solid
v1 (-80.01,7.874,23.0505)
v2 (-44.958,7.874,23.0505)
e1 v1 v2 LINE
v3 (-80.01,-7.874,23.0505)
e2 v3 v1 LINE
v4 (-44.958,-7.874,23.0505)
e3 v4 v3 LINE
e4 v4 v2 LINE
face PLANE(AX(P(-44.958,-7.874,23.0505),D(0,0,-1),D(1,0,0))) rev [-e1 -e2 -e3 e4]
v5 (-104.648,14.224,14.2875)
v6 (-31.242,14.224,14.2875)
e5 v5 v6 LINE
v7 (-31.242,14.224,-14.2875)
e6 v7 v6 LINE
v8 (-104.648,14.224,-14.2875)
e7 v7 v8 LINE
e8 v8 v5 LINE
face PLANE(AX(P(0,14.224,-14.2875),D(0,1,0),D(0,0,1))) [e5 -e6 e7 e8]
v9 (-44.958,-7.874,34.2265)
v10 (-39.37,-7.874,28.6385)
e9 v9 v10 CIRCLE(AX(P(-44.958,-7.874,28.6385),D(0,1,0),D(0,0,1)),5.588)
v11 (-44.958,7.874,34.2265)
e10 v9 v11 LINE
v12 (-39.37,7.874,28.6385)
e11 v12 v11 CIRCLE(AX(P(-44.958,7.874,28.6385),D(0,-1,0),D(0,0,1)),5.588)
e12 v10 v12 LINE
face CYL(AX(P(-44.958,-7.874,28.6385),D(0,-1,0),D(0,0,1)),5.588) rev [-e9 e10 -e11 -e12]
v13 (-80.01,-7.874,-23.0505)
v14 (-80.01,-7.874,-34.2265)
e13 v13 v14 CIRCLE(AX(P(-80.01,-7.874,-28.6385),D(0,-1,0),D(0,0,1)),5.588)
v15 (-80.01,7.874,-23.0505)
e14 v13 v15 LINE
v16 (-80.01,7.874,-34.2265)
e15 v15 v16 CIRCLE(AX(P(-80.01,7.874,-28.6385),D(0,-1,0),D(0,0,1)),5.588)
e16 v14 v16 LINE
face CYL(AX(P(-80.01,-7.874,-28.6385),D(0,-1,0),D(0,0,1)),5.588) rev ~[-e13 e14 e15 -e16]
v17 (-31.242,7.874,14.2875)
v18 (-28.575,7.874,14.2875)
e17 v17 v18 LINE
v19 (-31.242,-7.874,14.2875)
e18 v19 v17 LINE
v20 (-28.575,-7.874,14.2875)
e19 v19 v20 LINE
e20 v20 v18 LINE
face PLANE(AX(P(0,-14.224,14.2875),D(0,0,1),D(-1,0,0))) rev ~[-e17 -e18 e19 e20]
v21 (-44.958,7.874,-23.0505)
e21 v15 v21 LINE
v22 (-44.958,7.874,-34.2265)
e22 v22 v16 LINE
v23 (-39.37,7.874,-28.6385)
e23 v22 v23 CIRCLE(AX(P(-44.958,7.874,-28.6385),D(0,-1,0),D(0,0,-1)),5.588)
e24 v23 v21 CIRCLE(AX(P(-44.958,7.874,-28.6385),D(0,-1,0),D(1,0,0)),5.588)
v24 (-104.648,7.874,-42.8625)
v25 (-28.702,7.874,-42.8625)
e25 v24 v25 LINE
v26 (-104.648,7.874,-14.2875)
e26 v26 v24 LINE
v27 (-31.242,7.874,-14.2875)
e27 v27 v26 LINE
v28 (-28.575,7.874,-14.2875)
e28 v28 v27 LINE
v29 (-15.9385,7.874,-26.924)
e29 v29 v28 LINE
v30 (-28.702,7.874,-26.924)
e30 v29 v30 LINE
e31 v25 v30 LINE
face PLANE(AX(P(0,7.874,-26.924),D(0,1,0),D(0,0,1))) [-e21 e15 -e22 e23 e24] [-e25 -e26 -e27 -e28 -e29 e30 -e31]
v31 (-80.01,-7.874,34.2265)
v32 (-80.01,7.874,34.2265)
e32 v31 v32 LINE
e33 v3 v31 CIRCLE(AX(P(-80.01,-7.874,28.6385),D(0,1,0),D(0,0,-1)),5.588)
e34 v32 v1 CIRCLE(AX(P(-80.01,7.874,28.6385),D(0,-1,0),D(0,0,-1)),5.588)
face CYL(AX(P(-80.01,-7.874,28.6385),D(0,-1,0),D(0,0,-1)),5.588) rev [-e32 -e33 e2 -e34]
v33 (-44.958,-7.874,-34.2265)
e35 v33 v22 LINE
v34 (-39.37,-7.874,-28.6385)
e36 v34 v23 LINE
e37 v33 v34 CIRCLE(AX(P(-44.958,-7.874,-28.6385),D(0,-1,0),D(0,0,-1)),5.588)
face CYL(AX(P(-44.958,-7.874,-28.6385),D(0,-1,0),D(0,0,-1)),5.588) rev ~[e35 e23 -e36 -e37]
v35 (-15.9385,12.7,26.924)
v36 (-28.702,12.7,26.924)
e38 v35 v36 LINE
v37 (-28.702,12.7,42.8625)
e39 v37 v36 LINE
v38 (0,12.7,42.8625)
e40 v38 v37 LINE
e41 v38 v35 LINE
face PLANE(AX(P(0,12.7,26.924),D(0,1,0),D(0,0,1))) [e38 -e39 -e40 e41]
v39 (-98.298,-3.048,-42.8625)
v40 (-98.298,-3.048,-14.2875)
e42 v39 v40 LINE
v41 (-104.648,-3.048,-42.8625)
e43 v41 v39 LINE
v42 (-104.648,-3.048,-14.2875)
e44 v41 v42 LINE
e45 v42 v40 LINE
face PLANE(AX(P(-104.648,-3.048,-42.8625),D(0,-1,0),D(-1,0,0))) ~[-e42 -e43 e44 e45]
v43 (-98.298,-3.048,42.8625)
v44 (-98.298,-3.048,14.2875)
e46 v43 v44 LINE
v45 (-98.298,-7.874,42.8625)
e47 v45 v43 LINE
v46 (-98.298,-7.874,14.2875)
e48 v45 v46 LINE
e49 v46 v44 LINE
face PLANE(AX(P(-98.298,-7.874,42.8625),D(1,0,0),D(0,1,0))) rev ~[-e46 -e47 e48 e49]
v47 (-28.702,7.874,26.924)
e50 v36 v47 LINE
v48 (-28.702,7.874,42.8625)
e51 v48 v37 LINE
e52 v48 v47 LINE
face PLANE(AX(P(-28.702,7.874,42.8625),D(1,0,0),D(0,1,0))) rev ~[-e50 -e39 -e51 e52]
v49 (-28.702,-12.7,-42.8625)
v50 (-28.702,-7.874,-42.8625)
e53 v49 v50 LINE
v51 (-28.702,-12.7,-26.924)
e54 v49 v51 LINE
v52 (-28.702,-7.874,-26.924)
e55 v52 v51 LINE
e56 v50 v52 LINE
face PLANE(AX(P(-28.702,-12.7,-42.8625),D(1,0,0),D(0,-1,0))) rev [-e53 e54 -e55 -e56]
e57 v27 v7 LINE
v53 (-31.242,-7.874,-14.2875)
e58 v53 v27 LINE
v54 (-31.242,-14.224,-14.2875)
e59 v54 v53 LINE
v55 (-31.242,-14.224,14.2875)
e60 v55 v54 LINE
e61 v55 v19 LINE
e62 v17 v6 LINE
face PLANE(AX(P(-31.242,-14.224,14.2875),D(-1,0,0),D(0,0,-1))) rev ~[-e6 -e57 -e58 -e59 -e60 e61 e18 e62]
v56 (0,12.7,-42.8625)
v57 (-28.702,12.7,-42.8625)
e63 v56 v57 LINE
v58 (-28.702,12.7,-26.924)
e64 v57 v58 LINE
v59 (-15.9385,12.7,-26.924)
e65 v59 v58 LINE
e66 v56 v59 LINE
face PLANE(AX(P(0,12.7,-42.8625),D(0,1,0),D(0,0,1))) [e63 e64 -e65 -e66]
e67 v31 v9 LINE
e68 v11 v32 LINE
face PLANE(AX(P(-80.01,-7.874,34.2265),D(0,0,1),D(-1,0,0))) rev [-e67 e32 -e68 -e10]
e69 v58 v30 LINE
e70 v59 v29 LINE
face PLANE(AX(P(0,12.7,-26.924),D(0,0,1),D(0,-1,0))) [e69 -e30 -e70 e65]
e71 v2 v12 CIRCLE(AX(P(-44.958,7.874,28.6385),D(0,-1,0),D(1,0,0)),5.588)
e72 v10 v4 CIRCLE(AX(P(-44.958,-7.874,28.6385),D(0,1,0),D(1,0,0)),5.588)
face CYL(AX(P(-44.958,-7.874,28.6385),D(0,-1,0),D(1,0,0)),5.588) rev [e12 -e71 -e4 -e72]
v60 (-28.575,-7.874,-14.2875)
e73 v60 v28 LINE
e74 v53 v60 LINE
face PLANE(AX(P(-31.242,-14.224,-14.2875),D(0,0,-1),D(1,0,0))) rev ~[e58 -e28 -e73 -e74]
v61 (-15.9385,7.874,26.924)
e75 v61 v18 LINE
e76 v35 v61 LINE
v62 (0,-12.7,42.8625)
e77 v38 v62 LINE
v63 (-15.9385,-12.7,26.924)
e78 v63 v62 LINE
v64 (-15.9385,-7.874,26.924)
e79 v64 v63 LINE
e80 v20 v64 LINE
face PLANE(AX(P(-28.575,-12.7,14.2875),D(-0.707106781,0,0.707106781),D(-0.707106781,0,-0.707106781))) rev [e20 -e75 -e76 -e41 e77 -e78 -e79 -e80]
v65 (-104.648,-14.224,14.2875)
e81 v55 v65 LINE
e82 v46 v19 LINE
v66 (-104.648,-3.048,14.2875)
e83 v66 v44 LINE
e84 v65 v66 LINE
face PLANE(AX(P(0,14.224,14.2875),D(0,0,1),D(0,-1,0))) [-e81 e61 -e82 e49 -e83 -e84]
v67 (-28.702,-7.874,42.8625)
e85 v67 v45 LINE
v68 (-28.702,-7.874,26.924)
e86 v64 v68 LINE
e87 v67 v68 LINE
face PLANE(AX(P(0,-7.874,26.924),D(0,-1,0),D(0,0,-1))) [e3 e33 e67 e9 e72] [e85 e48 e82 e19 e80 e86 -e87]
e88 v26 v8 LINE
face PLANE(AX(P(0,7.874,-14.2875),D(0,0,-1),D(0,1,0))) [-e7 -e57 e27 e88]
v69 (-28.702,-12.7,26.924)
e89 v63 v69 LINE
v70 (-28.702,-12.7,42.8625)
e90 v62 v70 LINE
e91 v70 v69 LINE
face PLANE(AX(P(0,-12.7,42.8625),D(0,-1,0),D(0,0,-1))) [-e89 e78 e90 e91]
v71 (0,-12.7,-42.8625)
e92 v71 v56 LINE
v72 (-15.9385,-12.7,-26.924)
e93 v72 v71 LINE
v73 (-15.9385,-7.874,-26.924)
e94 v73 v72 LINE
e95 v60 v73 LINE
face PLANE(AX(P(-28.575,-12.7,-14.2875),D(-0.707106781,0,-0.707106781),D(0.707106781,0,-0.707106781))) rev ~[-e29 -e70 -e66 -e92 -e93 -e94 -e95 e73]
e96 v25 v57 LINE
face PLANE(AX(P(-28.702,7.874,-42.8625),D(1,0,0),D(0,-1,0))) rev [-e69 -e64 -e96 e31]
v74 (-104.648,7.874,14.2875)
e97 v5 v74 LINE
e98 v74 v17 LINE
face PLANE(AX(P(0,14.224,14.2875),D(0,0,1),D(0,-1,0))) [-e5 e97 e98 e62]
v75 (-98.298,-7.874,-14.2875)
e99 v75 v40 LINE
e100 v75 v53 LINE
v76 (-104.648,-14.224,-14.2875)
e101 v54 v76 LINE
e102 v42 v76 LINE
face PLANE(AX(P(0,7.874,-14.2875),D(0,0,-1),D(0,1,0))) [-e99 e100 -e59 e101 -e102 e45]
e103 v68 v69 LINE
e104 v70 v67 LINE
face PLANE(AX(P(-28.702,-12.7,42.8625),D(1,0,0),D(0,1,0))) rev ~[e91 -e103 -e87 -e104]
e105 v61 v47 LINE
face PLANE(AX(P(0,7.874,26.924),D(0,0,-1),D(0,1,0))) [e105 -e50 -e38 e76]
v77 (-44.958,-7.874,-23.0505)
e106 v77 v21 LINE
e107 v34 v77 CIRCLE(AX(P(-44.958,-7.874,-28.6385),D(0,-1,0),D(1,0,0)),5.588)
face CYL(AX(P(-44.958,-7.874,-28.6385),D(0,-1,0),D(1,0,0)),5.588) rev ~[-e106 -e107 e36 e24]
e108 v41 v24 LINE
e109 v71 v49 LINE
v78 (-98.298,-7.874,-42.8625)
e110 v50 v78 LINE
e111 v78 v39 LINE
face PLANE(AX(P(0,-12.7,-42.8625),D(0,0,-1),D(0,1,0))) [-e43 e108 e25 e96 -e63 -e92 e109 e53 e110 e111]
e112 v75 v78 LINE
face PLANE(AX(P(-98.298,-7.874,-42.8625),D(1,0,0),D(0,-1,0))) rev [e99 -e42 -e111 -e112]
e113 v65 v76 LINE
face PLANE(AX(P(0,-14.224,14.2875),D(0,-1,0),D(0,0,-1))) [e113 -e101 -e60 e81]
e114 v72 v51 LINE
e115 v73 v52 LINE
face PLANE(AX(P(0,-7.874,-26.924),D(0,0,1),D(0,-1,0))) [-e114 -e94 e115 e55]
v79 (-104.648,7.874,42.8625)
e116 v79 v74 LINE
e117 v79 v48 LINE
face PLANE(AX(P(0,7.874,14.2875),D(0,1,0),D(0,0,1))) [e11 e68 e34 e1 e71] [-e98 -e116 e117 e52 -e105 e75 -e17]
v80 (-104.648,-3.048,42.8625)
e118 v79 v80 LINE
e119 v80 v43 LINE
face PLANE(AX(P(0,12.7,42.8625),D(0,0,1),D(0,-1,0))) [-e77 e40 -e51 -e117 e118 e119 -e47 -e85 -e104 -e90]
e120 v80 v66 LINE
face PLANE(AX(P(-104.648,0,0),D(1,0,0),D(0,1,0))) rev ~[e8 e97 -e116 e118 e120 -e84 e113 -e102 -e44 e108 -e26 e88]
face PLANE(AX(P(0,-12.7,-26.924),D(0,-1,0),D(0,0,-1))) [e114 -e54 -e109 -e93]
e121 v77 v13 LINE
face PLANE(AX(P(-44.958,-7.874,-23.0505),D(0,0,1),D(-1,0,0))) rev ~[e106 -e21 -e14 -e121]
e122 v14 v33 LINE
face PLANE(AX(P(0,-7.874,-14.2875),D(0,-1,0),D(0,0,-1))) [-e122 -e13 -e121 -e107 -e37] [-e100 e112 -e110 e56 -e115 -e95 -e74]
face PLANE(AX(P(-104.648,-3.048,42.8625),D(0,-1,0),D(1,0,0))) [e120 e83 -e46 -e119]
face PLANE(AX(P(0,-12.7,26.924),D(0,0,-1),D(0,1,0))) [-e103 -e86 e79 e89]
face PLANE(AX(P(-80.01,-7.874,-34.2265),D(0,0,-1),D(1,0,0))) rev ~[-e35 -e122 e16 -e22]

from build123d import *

# Parameters (mm, degrees)
F1_DEPTH = 104.648
F2_W     = 75.946
F2_H     = 4.826
F2_W_2   = 6.35
F3_DEPTH = 28.575
F5_DEPTH = 22.099
F7_DEPTH = 26.925
F9_DEPTH = 28.449


# Not quite as in the source:
# - a pattern or mirror of a feature is missing from the dataset's text; its kind, count and spacing are read off the source's solid


with BuildPart() as f1:
    # F0 (on Right) → F1 (new body)
    with BuildSketch(Plane.YZ):
        Polygon((7.874, -14.2875), (14.224, -14.2875), (14.224, 14.2875), (7.874, 14.2875), (-7.874, 14.2875), (-14.224, 14.2875), (-14.224, -14.2875), (-7.874, -14.2875), align=None)
        Polygon((-7.874, 14.2875), (7.874, 14.2875), (7.874, 26.924), (12.7, 26.924), (12.7, 42.8625), (0, 42.8625), (-12.7, 42.8625), (-12.7, 26.924), (-7.874, 26.924), align=None)
        Polygon((7.874, -26.924), (7.874, -14.2875), (-7.874, -14.2875), (-7.874, -26.924), (-12.7, -26.924), (-12.7, -42.8625), (0, -42.8625), (12.7, -42.8625), (12.7, -26.924), align=None)
    extrude(amount=-F1_DEPTH)

    # F2 (on face) → F3 (cut)
    with BuildSketch(Plane.XY.offset(42.8625)):
        Polygon((-98.298, -7.874), (-104.648, -7.874), (-104.648, -12.7), (-28.702, -12.7), (-28.702, -7.874), align=None)
        with Locations((-66.675, 10.287)):
            Rectangle(F2_W, F2_H)
        with Locations((-101.473, -5.461)):
            Rectangle(F2_W_2, F2_H)
    f3 = extrude(amount=-F3_DEPTH, mode=Mode.SUBTRACT)

    # F3_copies: F3 across plane
    add(f3.mirror(Plane(origin=(0, 0, 0), x_dir=(-1, 0, 0), z_dir=(0, 0, -1))), mode=Mode.SUBTRACT)

    # F4 (on face) → F5 (cut, through all)
    with BuildSketch(Plane.XZ.offset(7.874)):
        with BuildLine():
            ThreePointArc((-80.01, -34.2265), (-76.0586873067, -32.5898126933), (-74.422, -28.6385))
            ThreePointArc((-74.422, -28.6385), (-76.0586873067, -24.6871873067), (-80.01, -23.0505))
            ThreePointArc((-80.01, -23.0505), (-85.598, -28.6385), (-80.01, -34.2265))
        make_face()
        with BuildLine():
            ThreePointArc((-80.01, -23.0505), (-76.0586873067, -24.6871873067), (-74.422, -28.6385))
            ThreePointArc((-74.422, -28.6385), (-76.0586873067, -32.5898126933), (-80.01, -34.2265))
            Line((-80.01, -34.2265), (-44.958, -34.2265))
            ThreePointArc((-44.958, -34.2265), (-50.546, -28.6385), (-44.958, -23.0505))
            Line((-44.958, -23.0505), (-80.01, -23.0505))
        make_face()
        with BuildLine():
            ThreePointArc((-39.37, -28.6385), (-41.0066873067, -24.6871873067), (-44.958, -23.0505))
            ThreePointArc((-44.958, -23.0505), (-50.546, -28.6385), (-44.958, -34.2265))
            ThreePointArc((-44.958, -34.2265), (-41.0066873067, -32.5898126933), (-39.37, -28.6385))
        make_face()
    f5 = extrude(amount=-F5_DEPTH, mode=Mode.SUBTRACT)

    # F5_copies: F5 across plane
    add(f5.mirror(Plane.XY), mode=Mode.SUBTRACT)

    # F6 (on face) → F7 (cut, through all)
    with BuildSketch(Plane.XZ.offset(12.7)):
        Polygon((0, -14.2875), (-28.575, -14.2875), (0, -42.8625), align=None)
    f7 = extrude(amount=-F7_DEPTH, mode=Mode.SUBTRACT)

    # F7_copies: F7 across plane
    add(f7.mirror(Plane.XY), mode=Mode.SUBTRACT)

    # F8 (on face) → F9 (cut, through all)
    with BuildSketch(Plane.XZ.offset(14.224)):
        Polygon((-31.242, 14.2875), (-31.242, 0), (-31.242, -14.2875), (0, -14.2875), (0, 14.2875), align=None)
    extrude(amount=-F9_DEPTH, mode=Mode.SUBTRACT)


solid = f1.part
